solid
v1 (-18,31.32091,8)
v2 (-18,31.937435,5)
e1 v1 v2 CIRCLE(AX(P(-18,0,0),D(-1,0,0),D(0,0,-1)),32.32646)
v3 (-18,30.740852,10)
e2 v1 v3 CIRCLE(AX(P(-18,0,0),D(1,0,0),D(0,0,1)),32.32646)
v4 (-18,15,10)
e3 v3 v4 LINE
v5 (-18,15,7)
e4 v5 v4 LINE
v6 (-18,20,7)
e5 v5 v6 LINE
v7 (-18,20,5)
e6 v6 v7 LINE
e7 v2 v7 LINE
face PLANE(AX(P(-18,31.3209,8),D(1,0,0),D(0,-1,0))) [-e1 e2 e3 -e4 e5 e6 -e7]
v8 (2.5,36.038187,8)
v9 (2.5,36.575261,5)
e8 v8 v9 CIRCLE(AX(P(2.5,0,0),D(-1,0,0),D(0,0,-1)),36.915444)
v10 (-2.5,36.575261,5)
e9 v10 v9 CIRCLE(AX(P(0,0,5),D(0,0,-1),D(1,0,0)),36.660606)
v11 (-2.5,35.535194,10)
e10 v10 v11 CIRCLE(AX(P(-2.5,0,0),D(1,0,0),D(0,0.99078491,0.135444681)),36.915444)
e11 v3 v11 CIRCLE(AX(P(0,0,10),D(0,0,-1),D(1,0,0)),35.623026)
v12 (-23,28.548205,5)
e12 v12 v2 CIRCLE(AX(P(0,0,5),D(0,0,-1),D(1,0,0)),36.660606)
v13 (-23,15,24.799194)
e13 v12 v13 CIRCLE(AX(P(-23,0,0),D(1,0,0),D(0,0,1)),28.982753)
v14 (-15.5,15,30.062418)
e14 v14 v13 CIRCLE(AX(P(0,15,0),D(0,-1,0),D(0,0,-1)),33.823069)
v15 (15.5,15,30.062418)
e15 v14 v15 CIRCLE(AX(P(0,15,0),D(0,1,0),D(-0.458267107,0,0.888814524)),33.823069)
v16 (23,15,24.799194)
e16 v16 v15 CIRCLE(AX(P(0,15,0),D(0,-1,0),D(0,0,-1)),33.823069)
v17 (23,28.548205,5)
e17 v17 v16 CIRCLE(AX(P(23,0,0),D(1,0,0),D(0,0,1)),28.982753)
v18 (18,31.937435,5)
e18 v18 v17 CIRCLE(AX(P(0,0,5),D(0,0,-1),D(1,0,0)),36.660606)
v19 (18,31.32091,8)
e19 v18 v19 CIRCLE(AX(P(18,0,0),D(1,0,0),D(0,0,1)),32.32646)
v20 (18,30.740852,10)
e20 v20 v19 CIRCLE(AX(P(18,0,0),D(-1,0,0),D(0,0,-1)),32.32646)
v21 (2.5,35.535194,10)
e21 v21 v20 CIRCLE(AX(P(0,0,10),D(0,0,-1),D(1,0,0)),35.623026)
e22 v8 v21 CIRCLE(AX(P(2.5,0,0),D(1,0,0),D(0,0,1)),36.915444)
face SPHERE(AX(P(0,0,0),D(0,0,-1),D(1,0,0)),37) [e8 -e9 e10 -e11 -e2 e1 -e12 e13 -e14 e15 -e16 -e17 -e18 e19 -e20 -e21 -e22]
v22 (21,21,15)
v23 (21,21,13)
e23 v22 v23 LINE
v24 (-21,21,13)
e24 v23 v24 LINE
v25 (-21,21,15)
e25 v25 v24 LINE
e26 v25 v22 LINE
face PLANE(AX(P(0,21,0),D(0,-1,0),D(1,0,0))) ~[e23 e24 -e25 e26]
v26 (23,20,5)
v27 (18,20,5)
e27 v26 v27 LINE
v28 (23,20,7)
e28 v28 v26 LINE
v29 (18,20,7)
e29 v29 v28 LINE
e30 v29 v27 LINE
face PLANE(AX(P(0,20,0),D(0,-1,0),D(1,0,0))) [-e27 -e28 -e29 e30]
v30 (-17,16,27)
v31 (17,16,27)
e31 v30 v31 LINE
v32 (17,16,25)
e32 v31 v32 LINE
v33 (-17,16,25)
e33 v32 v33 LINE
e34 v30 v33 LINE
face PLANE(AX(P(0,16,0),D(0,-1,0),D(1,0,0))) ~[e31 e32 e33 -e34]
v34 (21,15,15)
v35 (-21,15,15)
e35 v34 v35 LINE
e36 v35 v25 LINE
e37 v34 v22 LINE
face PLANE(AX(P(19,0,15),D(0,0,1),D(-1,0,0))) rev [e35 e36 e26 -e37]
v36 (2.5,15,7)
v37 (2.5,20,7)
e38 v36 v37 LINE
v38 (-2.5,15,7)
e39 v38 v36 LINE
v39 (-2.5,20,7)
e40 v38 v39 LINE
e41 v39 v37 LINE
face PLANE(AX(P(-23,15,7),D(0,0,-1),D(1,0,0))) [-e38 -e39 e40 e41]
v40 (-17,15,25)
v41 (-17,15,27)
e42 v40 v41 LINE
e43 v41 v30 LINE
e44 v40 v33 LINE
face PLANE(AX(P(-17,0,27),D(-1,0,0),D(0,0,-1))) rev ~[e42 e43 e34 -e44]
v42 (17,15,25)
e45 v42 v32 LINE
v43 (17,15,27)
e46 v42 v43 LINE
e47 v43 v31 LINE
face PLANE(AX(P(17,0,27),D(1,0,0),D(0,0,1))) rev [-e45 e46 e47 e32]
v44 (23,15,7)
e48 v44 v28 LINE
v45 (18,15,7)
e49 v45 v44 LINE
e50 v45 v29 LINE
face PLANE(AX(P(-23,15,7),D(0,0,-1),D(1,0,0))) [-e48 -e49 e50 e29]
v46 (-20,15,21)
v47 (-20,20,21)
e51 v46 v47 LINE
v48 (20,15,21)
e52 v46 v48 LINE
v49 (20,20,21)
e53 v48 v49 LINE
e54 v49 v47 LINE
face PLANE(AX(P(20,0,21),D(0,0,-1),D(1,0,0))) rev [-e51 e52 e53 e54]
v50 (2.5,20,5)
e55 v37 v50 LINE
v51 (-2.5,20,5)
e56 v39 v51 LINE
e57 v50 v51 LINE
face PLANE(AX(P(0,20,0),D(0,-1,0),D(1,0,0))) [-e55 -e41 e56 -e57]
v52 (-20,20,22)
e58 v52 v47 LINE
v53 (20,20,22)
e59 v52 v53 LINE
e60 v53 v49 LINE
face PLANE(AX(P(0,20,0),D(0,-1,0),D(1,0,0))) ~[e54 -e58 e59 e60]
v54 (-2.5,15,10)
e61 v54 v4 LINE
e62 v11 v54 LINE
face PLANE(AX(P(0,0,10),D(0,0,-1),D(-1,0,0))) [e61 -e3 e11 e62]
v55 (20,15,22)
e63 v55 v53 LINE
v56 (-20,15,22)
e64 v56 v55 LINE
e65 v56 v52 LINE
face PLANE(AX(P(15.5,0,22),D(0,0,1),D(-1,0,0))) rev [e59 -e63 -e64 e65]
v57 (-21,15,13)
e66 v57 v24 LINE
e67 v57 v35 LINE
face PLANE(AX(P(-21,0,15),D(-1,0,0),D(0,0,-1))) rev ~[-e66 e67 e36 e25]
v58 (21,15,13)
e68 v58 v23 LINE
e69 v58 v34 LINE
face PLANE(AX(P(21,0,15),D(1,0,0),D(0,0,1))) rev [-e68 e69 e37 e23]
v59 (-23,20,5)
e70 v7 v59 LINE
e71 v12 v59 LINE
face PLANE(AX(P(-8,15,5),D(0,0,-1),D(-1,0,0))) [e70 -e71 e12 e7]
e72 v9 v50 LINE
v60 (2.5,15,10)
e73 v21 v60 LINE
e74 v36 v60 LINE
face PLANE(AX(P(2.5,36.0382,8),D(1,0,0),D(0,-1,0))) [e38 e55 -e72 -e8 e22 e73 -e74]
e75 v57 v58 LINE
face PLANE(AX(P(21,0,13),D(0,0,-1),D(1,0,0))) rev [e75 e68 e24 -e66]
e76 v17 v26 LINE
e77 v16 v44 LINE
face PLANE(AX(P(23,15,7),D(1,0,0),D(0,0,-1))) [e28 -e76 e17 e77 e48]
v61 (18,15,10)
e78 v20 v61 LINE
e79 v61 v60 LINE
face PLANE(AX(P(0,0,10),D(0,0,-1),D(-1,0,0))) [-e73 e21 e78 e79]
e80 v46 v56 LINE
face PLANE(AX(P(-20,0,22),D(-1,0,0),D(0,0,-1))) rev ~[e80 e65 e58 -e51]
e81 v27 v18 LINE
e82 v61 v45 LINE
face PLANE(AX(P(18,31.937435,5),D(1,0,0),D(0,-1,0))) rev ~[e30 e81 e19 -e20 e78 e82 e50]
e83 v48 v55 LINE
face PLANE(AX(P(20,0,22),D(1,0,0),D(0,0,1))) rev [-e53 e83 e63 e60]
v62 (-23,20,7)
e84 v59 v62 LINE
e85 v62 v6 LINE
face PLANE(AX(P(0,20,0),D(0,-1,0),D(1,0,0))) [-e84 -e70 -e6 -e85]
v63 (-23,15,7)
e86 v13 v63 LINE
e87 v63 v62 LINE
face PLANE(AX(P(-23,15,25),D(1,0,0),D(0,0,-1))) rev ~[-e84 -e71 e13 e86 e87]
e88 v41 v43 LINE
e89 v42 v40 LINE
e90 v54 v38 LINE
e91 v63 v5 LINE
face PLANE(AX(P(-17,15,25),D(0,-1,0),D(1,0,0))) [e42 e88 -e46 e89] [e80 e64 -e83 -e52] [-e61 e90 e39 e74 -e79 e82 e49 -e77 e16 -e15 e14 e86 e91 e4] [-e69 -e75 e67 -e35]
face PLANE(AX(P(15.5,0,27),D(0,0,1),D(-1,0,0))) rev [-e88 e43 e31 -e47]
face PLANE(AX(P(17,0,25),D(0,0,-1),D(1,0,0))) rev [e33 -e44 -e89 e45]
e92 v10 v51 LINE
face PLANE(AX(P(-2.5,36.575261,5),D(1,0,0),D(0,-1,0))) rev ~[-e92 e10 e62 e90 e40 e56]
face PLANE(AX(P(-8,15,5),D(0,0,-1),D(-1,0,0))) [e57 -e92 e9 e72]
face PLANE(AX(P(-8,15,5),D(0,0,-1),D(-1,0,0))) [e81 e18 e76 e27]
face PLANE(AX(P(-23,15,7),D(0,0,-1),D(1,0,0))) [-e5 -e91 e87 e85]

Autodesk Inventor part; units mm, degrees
sketch "スケッチ1" plane through (0, 0, 0) normal (0, 1, 0) x (-1, 0, 0)
  circle A0 centre (0, 0) radius 37
  line L0 (0, 0) -> (0, -37)
  line L1 (0, 0) -> (0, 37)
  dimension "d0" = 74
revolve "回転1" add sketch "スケッチ1" angle 180 about axis through (0, 0, 0) along (0, 0, 1) picked at (-2.7444, -24.3574) contours L1 L0 A0
sketch "スケッチ5" plane through (0, 0, 0) normal (0, -1, 0) x (1, 0, 0)
  line L0 (-20, -25) -> (20, -25)
  line L1 (20, -25) -> (20, -15)
  line L2 (20, -15) -> (-20, -15)
  line L3 (-20, -15) -> (-20, -25)
  line L4 (-20, -17) -> (-20, -15)
  line L5 (0, 27) -> (-17, 27)
  line L6 (-17, 27) -> (-17, 25)
  line L7 (-17, 25) -> (0, 25)
  line L8 (0, 25) -> (0, 27)
  line L9 (0, 22) -> (-20, 22)
  line L10 (-20, 22) -> (-20, 21)
  line L11 (-20, 21) -> (0, 21)
  line L12 (0, 21) -> (0, 22)
  line L13 (0, 15) -> (-21, 15)
  line L14 (-21, 15) -> (-21, 13)
  line L15 (-21, 13) -> (0, 13)
  line L16 (0, 13) -> (0, 15)
  line L17 (0, 7) -> (-23, 7)
  line L18 (-23, 7) -> (-23, 5)
  line L19 (-23, 5) -> (0, 5)
  line L20 (0, 5) -> (0, 7)
  circle A0 centre (0, 0) radius 37 projected
  circle A1 centre (0, 0) radius 37 projected
  line L21 (0, 37) -> (0, -37)
  line L22 (37, 0) -> (-37, 0)
  line L23 (-32, 4) -> (-23, 4)
  line L24 (-23, 4) -> (-23, -6)
  line L25 (-23, -6) -> (-32, -6)
  line L26 (-32, -6) -> (-32, 4)
  line L27 (-23, -8.0262) -> (-23, 4)
  line L28 (-27, 25.2982) -> (-27, -25.2982)
  line L29 (-15.5, 27) -> (-12, 27)
  line L30 (-12, 27) -> (-12, 35)
  line L31 (-12, 35) -> (-15.5, 35)
  line L32 (-15.5, 35) -> (-15.5, 27)
  line L33 (-15.5, 25) -> (0, 25)
  line L34 (0, 25) -> (0, 22)
  line L35 (0, 22) -> (-15.5, 22)
  line L36 (-15.5, 22) -> (-15.5, 25)
  line L37 (-19, 15) -> (0, 15)
  line L38 (0, 15) -> (0, 21)
  line L39 (0, 21) -> (-19, 21)
  line L40 (-19, 21) -> (-19, 15)
  line L41 (-19, 13) -> (0, 13)
  line L42 (0, 13) -> (0, 7)
  line L43 (0, 7) -> (-19, 7)
  line L44 (-19, 7) -> (-19, 13)
  line L45 (-23, -1) -> (-39.6865, -1)
  line L46 (-23, -1) -> (-7.8337, -1)
  line L47 (-8, 5) -> (-23, 5)
  line L48 (-23, 5) -> (-23, -7)
  line L49 (-23, -7) -> (-8, -7)
  line L50 (-8, -7) -> (-8, 5)
  line L51 (-8, 5) -> (-23, -7) construction
  line L52 (-23, 5) -> (-8, -7) construction
  line L53 (-23, 6) -> (-33, 6)
  line L54 (-33, 6) -> (-33, -8)
  line L55 (-33, -8) -> (-23, -8)
  line L56 (-23, -8) -> (-23, 6)
  line L57 (-23, 6) -> (-33, -8) construction
  line L58 (-33, 6) -> (-23, -8) construction
  line L59 (-8, 5) -> (-1, 5)
  line L60 (-1, 5) -> (-1, -7)
  line L61 (-1, -7) -> (-8, -7)
  line L62 (-8, -7) -> (-8, 5)
  line L63 (-8, 5) -> (-1, -7) construction
  line L64 (-1, 5) -> (-8, -7) construction
  line L65 (-23, 4) -> (-27, 4)
  line L66 (-23, -6) -> (-27, -6)
  line L67 (-23, 6) -> (-27, 6)
  line L68 (-23, -8) -> (-27, -8)
  line L69 (26.3249, -26) -> (-26.3249, -26)
  line L70 (-8, 5) -> (-6.8, 5)
  line L71 (-6.8, 5) -> (-6.8, -7)
  line L72 (-6.8, -7) -> (-8, -7)
  line L73 (-8, -7) -> (-8, 5)
  line L74 (-3, 7) -> (0, 7)
  line L75 (0, 22) -> (-4, 22)
  line L76 (-4, 21) -> (0, 21)
  line L77 (0, 21) -> (0, 22)
  line L78 (-6, 7) -> (-1, 7)
  line L79 (-1, 5) -> (-6, 5)
  point P0 (0, -25)
  point P1 (0, -15)
  point P2 (0, 26)
  point P3 (0, 21.5)
  point P4 (0, 14)
  point P5 (0, 6)
  point P6 (-20, -20)
  point P7 (-27, -0.5262)
  point P8 (-15.5, 23.5)
  point P9 (-15.5, 33.5969)
  point P10 (0, 27)
  point P11 (0, 37)
  point P12 (0, 25)
  point P13 (0, 13)
  point P14 (0, 15)
  point P15 (-27, 0)
  point P16 (-32, 0)
  point P17 (-23, 0)
  point P18 (-15.5, -1)
  point P19 (-28, -1)
  point P20 (-4.5, -1)
  point P21 (-8, 5)
  point P22 (-27, 0.5)
  point P23 (-28, 0.4738)
  point P24 (-28, -11.5262)
  point P25 (-27, -11.5)
  point P26 (-23, -6)
  point P27 (-23, 4)
  point P28 (-23, 4)
  point P29 (-23, -6)
  point P30 (-23, -7)
  point P31 (-8, 0)
  point P32 (-1, 0)
  point P33 (-26.3249, -26)
  point P34 (0, 22)
  point P35 (-27, 6)
  point P36 (-19, 10)
  dimension "d12" = 40
  dimension "d13" = 10
  dimension "d23" = 17
  dimension "d24" = 2
  dimension "d27" = 20
  dimension "d28" = 1
  dimension "d30" = 21
  dimension "d31" = 2
  dimension "d33" = 2
  dimension "d88" = 0
  dimension "d89" = 0
  dimension "d90" = 12
  dimension "d92" = 20
  dimension "d93" = 10
  dimension "d97" = 9
  dimension "d98" = 10
  dimension "d113" = 27
  dimension "d122" = 15.5
  dimension "d123" = 35
  dimension "d124" = 3
  dimension "d125" = 15.5
  dimension "d126" = 6
  dimension "d127" = 6
  dimension "d147" = 12
  dimension "d149" = 8
  dimension "d151" = 15
  dimension "d161" = 14
  dimension "d162" = 10
  dimension "d164" = 12
  dimension "d165" = 7
  dimension "d170" = 26
  dimension "d175" = 1.2
  dimension "d207" = 0
  dimension "d283" = 2
  dimension "d284" = 2
extrude "GNSボード" cut sketch "スケッチ5" against normal blind 16 contours L8 L7 L6 L5
extrude "GNSボード止めるよう" cut sketch "スケッチ5" against normal blind 15 contours L21 L5 L30 A0 | L30 L5 L32 A0 | L21 L9 L36 L7
extrude "アルミ板１" cut sketch "スケッチ5" against normal blind 20 contours L11 L10 L9 L12
extrude "メイン基板" cut sketch "スケッチ5" against normal blind 21 contours L15 L14 L13 L16
extrude "メイン止めるよう" cut sketch "スケッチ5" against normal blind 14.5 contours L17 L44 L15 L21 | L13 L40 L11 L21
extrude "アルミ板２" cut sketch "スケッチ5" against normal blind 20 contours L19 L18 L17 L20
extrude "電池ボックス入れ" cut sketch "スケッチ5" against normal blind 13 contours L3 L2 L21 L0 | L21 L2 L1 L0
extrude "side ut" cut sketch "スケッチ5" against normal blind 100 contours A0 L45 L54 L55 L28 | A0 L22 L54 L45 | L55 L54 L45 L26 L25 L28 | A0 L28 L53 L54 L22 | L54 L22 L26 L45 | L25 L26 L45 L28 | L54 L53 L28 L23 L26 L22 | L26 L22 L28 L45 | L22 L26 L23 L28
extrude "motor case" add sketch "スケッチ5" against normal blind 7 contours L55 L54 L45 L26 L25 L28 | L28 L25 L27 L55 | L50 L46 L24 L22 | L22 L24 L48 L19 L50 | L54 L22 L26 L45 | L28 L45 L24 L25 | L25 L26 L45 L28 | L24 L45 L28 L22 | L22 L28 L23 L24 | L50 L49 L27 L24 L46 | L54 L53 L28 L23 L26 L22 | L26 L22 L28 L45 | L22 L26 L23 L28 | L23 L28 L53 L18 L48
extrude "bottom cut" cut sketch "スケッチ5" against normal blind 90 contours L69 A0 L21 | L21 A0 L69
extrude "motor" cut sketch "スケッチ5" against normal blind 6 contours L60 L61 L71 L22 | L22 L71 L19 L60 | L71 L61 L50 L22 | L22 L50 L19 L71 | L50 L46 L24 L22 | L22 L24 L48 L19 L50 | L28 L45 L24 L25 | L25 L26 L45 L28 | L24 L45 L28 L22 | L22 L28 L23 L24 | L50 L49 L27 L24 L46 | L26 L22 L28 L45 | L22 L26 L23 L28
extrude "motor block" add sketch "スケッチ5" against normal blind 10 contours L71 L61 L50 L22 | L22 L50 L19 L71
sketch "スケッチ27" plane through (-33, 0, -8) normal (-1, 0, 0) x (0, 0, 1)
  line L0 (14, 0) -> (0, 0) projected
  circle A0 centre (7, 0) radius 3
  point P0 (8, 0)
  dimension "d198" = 6
extrude "押し出し36" cut sketch "スケッチ27" against normal blind 27
mirror "ミラー13" about plane through (0, 0, 0) normal (1, 0, 0) of "メイン止めるよう", "メイン基板", "アルミ板１", "GNSボード止めるよう", "GNSボード", "アルミ板２", "motor", "motor case", "押し出し36", "電池ボックス入れ", "side ut", "motor block"
ref_plane "作業平面5" through (-17, 17.5, 25) normal (0, -1, 0) x (1, 0, 0)
ref_plane "作業平面6" through (20, 13, -15) normal (0, 0, -1) x (1, 0, 0)
sketch "スケッチ38" plane through (20, 13, -15) normal (0, 0, -1) x (1, 0, 0)
  line L0 (-40, 13) -> (0, 13) projected
  line L1 (-40, 13) -> (-40, 0) projected
  line L2 (-40, 0) -> (0, 0) projected
  line L3 (0, 13) -> (0, 0) projected
  line L4 (-38, 6) -> (-28, 6)
  line L5 (-28, 6) -> (-28, -3)
  line L6 (-28, -3) -> (-38, -3)
  line L7 (-38, -3) -> (-38, 6)
  point P0 (-20, 13)
  dimension "d235" = 3
  dimension "d236" = 9
  dimension "d237" = 10
  dimension "d238" = 2
extrude "押し出し44" cut sketch "スケッチ38" against normal blind 18 contours L7 L4 L5 L2 | L2 L5 L6 L7
ref_plane "作業平面7" through (27, 35, 6) normal (0, -1, 0) x (1, 0, 0)
sketch "スケッチ41" plane through (-17, 0, 25) normal (0, -1, 0) x (1, 0, 0)
  line L0 (-16, -23) -> (-15, -23) projected
  line L1 (-15, -23) -> (-15, -21) projected
  line L2 (-15, -21) -> (-6, -21) projected
  line L3 (-6, -21) -> (-6, -18) projected
  line L4 (-6, -18) -> (-2, -18) projected
  line L5 (-2, -18) -> (-2, -12) projected
  line L6 (-2, -12) -> (-4, -12) projected
  line L7 (-4, -12) -> (-4, -10) projected
  line L8 (-4, -10) -> (-2, -10) projected
  line L9 (-2, -10) -> (-2, -4) projected
  line L10 (-2, -4) -> (-3, -4) projected
  line L11 (-3, -4) -> (-3, -3) projected
  line L12 (-3, -3) -> (1.5, -3) projected
  line L13 (1.5, -3) -> (1.5, 0) projected
  line L14 (1.5, 0) -> (0, 0) projected
  line L15 (0, 0) -> (0, 2) projected
  line L16 (0, 2) -> (1.5, 2) projected
  line L17 (1.5, 2) -> (1.5, 8.5969) projected
  arc A0 (1.5, 8.5969) -> (-10, 0.2982) centre (17, -25) ccw projected
  line L18 (-10, 0.2982) -> (-10, -19) projected
  line L19 (-10, -19) -> (-16, -19) projected
  line L20 (-16, -19) -> (-16, -23) projected
  line L21 (-2, -18) -> (-2, -12) projected
  line L22 (-4, -10) -> (-4, -12) projected
  line L23 (0, 2) -> (0, 0) projected
  circle A1 centre (-4, 0) radius 2
  dimension "d252" = 4
  dimension "d253" = 4
  dimension "d254" = 3
extrude "押し出し46" cut sketch "スケッチ41" against normal blind 10 contours A1
mirror "ミラー15" about plane through (0, 0, 0) normal (1, 0, 0) of "押し出し46"
sketch "スケッチ42" plane through (-33, 0, -8) normal (0, -1, 0) x (1, 0, 0)
  circle A0 centre (9.5, -8) radius 2
  line L0 (13, -17) -> (13, -7) projected
  line L1 (10, 2) -> (1, 2) projected
  point P0 (33, 8)
  dimension "d257" = 3.5
  dimension "d258" = 4
  dimension "d259" = 10
extrude "押し出し47" cut sketch "スケッチ42" against normal blind 10
mirror "ミラー16" about plane through (0, 0, 0) normal (1, 0, 0) of "押し出し47"
ref_plane "作業平面8" through (-17, 15, 25) normal (0, -1, 0) x (1, 0, 0)
sketch "スケッチ45" plane through (-17, 15, 25) normal (0, -1, 0) x (1, 0, 0)
  circle A0 centre (-4, 0) radius 2 projected
  line L0 (-16, -23) -> (-15, -23) projected
  line L1 (-15, -23) -> (-15, -21) projected
  line L2 (-15, -21) -> (-6, -21) projected
  line L3 (-6, -21) -> (-6, -18) projected
  line L4 (-6, -18) -> (-2, -18) projected
  line L5 (-2, -18) -> (-2, -12) projected
  line L6 (-2, -12) -> (-4, -12) projected
  line L7 (-4, -12) -> (-4, -10) projected
  line L8 (-4, -10) -> (-2, -10) projected
  line L9 (-2, -10) -> (-2, -4) projected
  line L10 (-2, -4) -> (-3, -4) projected
  line L11 (-3, -4) -> (-3, -3) projected
  line L12 (-3, -3) -> (1.5, -3) projected
  line L13 (1.5, -3) -> (1.5, 0) projected
  line L14 (1.5, 0) -> (0, 0) projected
  line L15 (0, 0) -> (0, 2) projected
  line L16 (0, 2) -> (1.5, 2) projected
  line L17 (1.5, 2) -> (1.5, 8.5969) projected
  arc A1 (1.5, 8.5969) -> (-10, 0.2982) centre (17, -25) ccw projected
  line L18 (-10, 0.2982) -> (-10, -19) projected
  line L19 (-10, -19) -> (-16, -19) projected
  line L20 (-16, -19) -> (-16, -23) projected
  arc A2 (32.5, 5.0624) -> (1.5, 5.0624) centre (17, -25) ccw projected
  line L21 (1.5, 2) -> (1.5, 5.0624) projected
  line L22 (32.5, 2) -> (1.5, 2) projected
  line L23 (32.5, 2) -> (32.5, 5.0624) projected
  circle A3 centre (38, 0) radius 2 projected
  circle A4 centre (38, 0) radius 2 projected
  line L24 (49, -23) -> (50, -23) projected
  line L25 (50, -19) -> (50, -23) projected
  line L26 (44, -19) -> (50, -19) projected
  line L27 (44, -19) -> (44, 0.2982) projected
  arc A5 (44, 0.2982) -> (32.5, 8.5969) centre (17, -25) ccw projected
  line L28 (32.5, 8.5969) -> (32.5, 2) projected
  line L29 (32.5, 2) -> (34, 2) projected
  line L30 (34, 2) -> (34, 0) projected
  line L31 (34, 0) -> (32.5, 0) projected
  line L32 (32.5, 0) -> (32.5, -3) projected
  line L33 (32.5, -3) -> (37, -3) projected
  line L34 (37, -3) -> (37, -4) projected
  line L35 (37, -4) -> (36, -4) projected
  line L36 (36, -4) -> (36, -10) projected
  line L37 (36, -10) -> (38, -10) projected
  line L38 (38, -10) -> (38, -12) projected
  line L39 (38, -12) -> (36, -12) projected
  line L40 (36, -12) -> (36, -18) projected
  line L41 (36, -18) -> (40, -18) projected
  line L42 (40, -18) -> (40, -21) projected
  line L43 (40, -21) -> (49, -21) projected
  line L44 (49, -21) -> (49, -23) projected
  circle A6 centre (-4, 0) radius 2 projected
  line L45 (1.5, 0) -> (32.5, 0) projected
  line L46 (32.5, -3) -> (1.5, -3) projected
  line L47 (32.5, -3) -> (32.5, 0) projected
  line L48 (1.5, 0) -> (32.5, 0) projected
  line L49 (1.5, -3) -> (1.5, 0) projected
  line L50 (34, 0) -> (0, 0) projected
  line L51 (34, 0) -> (34, 2) projected
  line L52 (34, 2) -> (0, 2) projected
  line L53 (0, 0) -> (0, 2) projected
  line L54 (36, -10) -> (-2, -10) projected
  line L55 (36, -10) -> (36, -4) projected
  line L56 (-2, -4) -> (36, -4) projected
  line L57 (-2, -10) -> (-2, -4) projected
  line L58 (38, -12) -> (-4, -12) projected
  line L59 (38, -12) -> (38, -10) projected
  line L60 (38, -10) -> (-4, -10) projected
  line L61 (-4, -12) -> (-4, -10) projected
  line L62 (36, -18) -> (-2, -18) projected
  line L63 (36, -18) -> (36, -12) projected
  line L64 (-2, -12) -> (36, -12) projected
  line L65 (-2, -18) -> (-2, -12) projected
  line L66 (40, -20) -> (-6, -20) projected
  line L67 (40, -20) -> (40, -18) projected
  line L68 (40, -18) -> (-6, -18) projected
  line L69 (-6, -20) -> (-6, -18) projected
  circle A7 centre (40.5, -41) radius 2 projected
  circle A8 centre (-6.5, -41) radius 2 projected
  line L70 (25, -29) -> (23.8, -29) projected
  line L71 (23.8, -32) -> (23.8, -29) projected
  line L72 (23.8, -32) -> (18, -32) projected
  line L73 (18, -32) -> (18, -20) projected
  line L74 (18, -20) -> (16, -20) projected
  line L75 (16, -20) -> (16, -32) projected
  line L76 (16, -32) -> (10.2, -32) projected
  line L77 (10.2, -32) -> (10.2, -29) projected
  line L78 (10.2, -29) -> (9, -29) projected
  line L79 (9, -29) -> (9, -32) projected
  line L80 (9, -32) -> (-6, -32) projected
  line L81 (-6, -32) -> (-6, -31) projected
  line L82 (-6, -31) -> (-15, -31) projected
  line L83 (-15, -31) -> (-15, -29) projected
  line L84 (-15, -29) -> (-16, -29) projected
  line L85 (-16, -29) -> (-16, -33) projected
  line L86 (-16, -33) -> (-10, -33) projected
  line L87 (-10, -33) -> (-10, -50.2982) projected
  arc A9 (-10, -50.2982) -> (-9.3249, -51) centre (17, -25) ccw projected
  line L88 (-9.3249, -51) -> (43.3249, -51) projected
  arc A10 (43.3249, -51) -> (44, -50.2982) centre (17, -25) ccw projected
  line L89 (44, -50.2982) -> (44, -33) projected
  line L90 (50, -33) -> (44, -33) projected
  line L91 (50, -29) -> (50, -33) projected
  line L92 (50, -29) -> (49, -29) projected
  line L93 (49, -29) -> (49, -31) projected
  line L94 (49, -31) -> (40, -31) projected
  line L95 (40, -31) -> (40, -32) projected
  line L96 (40, -32) -> (25, -32) projected
  line L97 (25, -29) -> (25, -32) projected
  line L98 (-3, -40) -> (37, -40) projected
  line L99 (37, -40) -> (37, -50) projected
  line L100 (37, -50) -> (-3, -50) projected
  line L101 (-3, -50) -> (-3, -40) projected
  line L102 (-6, -18) -> (40, -18)
  line L103 (40, -18) -> (40, 8.8231)
  line L104 (40, 8.8231) -> (-6, 8.8231)
  line L105 (-6, 8.8231) -> (-6, -18)
  arc A11 (32.5, 5.0624) -> (1.5, 5.0624) centre (17, -25) ccw projected
  line L106 (32.5, 5.0624) -> (32.5, 8.5969) projected
  arc A12 (44, 0.2982) -> (32.5, 8.5969) centre (17, -25) ccw projected
  line L107 (44, 0.2982) -> (44, -50.2982) projected
  arc A13 (43.3249, -51) -> (44, -50.2982) centre (17, -25) ccw projected
  line L108 (43.3249, -51) -> (-9.3249, -51) projected
  arc A14 (-10, -50.2982) -> (-9.3249, -51) centre (17, -25) ccw projected
  line L109 (-10, -50.2982) -> (-10, 0.2982) projected
  arc A15 (1.5, 8.5969) -> (-10, 0.2982) centre (17, -25) ccw projected
  line L110 (1.5, 8.5969) -> (1.5, 5.0624) projected
  line L111 (9, -32) -> (9, -20) projected
  line L112 (-6, -20) -> (9, -20) projected
  line L113 (-6, -21) -> (-6, -20) projected
  line L114 (-15, -21) -> (-6, -21) projected
  line L115 (-15, -31) -> (-15, -21) projected
  line L116 (-6, -31) -> (-15, -31) projected
  line L117 (-6, -32) -> (-6, -31) projected
  line L118 (9, -32) -> (-6, -32) projected
  line L119 (50, -29) -> (49, -29) projected
  line L120 (50, -23) -> (50, -29) projected
  line L121 (49, -23) -> (50, -23) projected
  line L122 (49, -29) -> (49, -23) projected
  line L123 (-16, -23) -> (-15, -23) projected
  line L124 (-16, -29) -> (-16, -23) projected
  line L125 (-15, -29) -> (-16, -29) projected
  line L126 (-15, -23) -> (-15, -29) projected
  point P0 (-10, -19)
  point P1 (-10, -33)
  point P2 (44, -33)
  point P3 (44, -19)
  point P4 (40, 3.9828)
  point P5 (40, -18)
  point P6 (40, -20)
  point P7 (-6, -20)
  point P8 (-6, -18)
  point P9 (-6, 3.9828)
  point P10 (-10, -33)
  point P11 (-10, -31)
  point P12 (44, -31)
  point P13 (44, -33)
  point P14 (50, -29)
  point P15 (50, -23)
  point P16 (44, -19)
  point P17 (-16, -23)
  point P18 (-16, -29)
  point P19 (-10, -19)
extrude "side and front cut" cut sketch "スケッチ45" along normal mid plane 100 contours L105 L3 L2 L109 L18 A1 | L66 L111 L79 L80 L81 L82 L109 L2 L3 | L109 L2 L1 L0 L20 L19 | L66 L75 L76 L77 L78 L111 | L109 L82 L83 L115 L1 L2 | L66 L73 L72 L71 L70 L97 L96 L95 L94 L107 L89 A10 L88 A9 L87 L109 L82 L81 L80 L79 L78 L77 L76 L75 | L103 A5 L27 L107 L43 L42 | L0 L115 L84 L124 | L109 L86 L85 L84 L83 L82 | L66 L42 L43 L107 L94 L95 L96 L97 L70 L71 L72 L73 | L26 L25 L24 L44 L43 L107 | L43 L44 L122 L93 L94 L107 | L94 L93 L92 L91 L90 L107 | L120 L92 L122 L24 | A7 | A8 | L98 L99 L100 L101
sketch "スケッチ46" plane through (-17, 15, 25) normal (0, -1, 0) x (1, 0, 0)
  line L0 (-6, 0) -> (-6, -18) projected
  line L1 (-6, -18) -> (-2, -18) projected
  line L2 (-2, -18) -> (-2, -12) projected
  line L3 (-2, -12) -> (-4, -12) projected
  line L4 (-4, -12) -> (-4, -10) projected
  line L5 (-4, -10) -> (-2, -10) projected
  line L6 (-2, -10) -> (-2, -4) projected
  line L7 (-2, -4) -> (-3, -4) projected
  line L8 (-3, -4) -> (-3, -3) projected
  line L9 (-3, -3) -> (1.5, -3) projected
  line L10 (1.5, -3) -> (1.5, 0) projected
  line L11 (1.5, 0) -> (0, 0) projected
  line L12 (0, 0) -> (0, 2) projected
  line L13 (0, 2) -> (1.5, 2) projected
  line L14 (1.5, 2) -> (1.5, 8.5969) projected
  arc A0 (1.5, 8.5969) -> (-6, 3.9828) centre (17, -25) ccw projected
  line L15 (-6, 3.9828) -> (-6, 0) projected
  circle A1 centre (-4, 0) radius 2 projected
  circle A2 centre (-4, 0) radius 2 projected
  line L16 (40, -18) -> (40, 0) projected
  circle A3 centre (38, 0) radius 2 projected
  line L17 (40, 0) -> (40, 3.9828) projected
  arc A4 (40, 3.9828) -> (32.5, 8.5969) centre (17, -25) ccw projected
  line L18 (32.5, 8.5969) -> (32.5, 2) projected
  line L19 (32.5, 2) -> (34, 2) projected
  line L20 (34, 2) -> (34, 0) projected
  line L21 (34, 0) -> (32.5, 0) projected
  line L22 (32.5, 0) -> (32.5, -3) projected
  line L23 (32.5, -3) -> (37, -3) projected
  line L24 (37, -3) -> (37, -4) projected
  line L25 (37, -4) -> (36, -4) projected
  line L26 (36, -4) -> (36, -10) projected
  line L27 (36, -10) -> (38, -10) projected
  line L28 (38, -10) -> (38, -12) projected
  line L29 (38, -12) -> (36, -12) projected
  line L30 (36, -12) -> (36, -18) projected
  line L31 (36, -18) -> (40, -18) projected
  arc A5 (32.5, 5.0624) -> (1.5, 5.0624) centre (17, -25) ccw projected
  line L32 (1.5, 2) -> (1.5, 5.0624) projected
  line L33 (32.5, 2) -> (1.5, 2) projected
  line L34 (32.5, 2) -> (32.5, 5.0624) projected
  line L35 (34, 0) -> (0, 0) projected
  line L36 (34, 0) -> (34, 2) projected
  line L37 (34, 2) -> (0, 2) projected
  line L38 (0, 0) -> (0, 2) projected
  line L39 (32.5, -3) -> (1.5, -3) projected
  line L40 (32.5, -3) -> (32.5, 0) projected
  line L41 (1.5, 0) -> (32.5, 0) projected
  line L42 (1.5, -3) -> (1.5, 0) projected
  line L43 (36, -10) -> (-2, -10) projected
  line L44 (36, -10) -> (36, -4) projected
  line L45 (-2, -4) -> (36, -4) projected
  line L46 (-2, -10) -> (-2, -4) projected
  line L47 (36, -18) -> (-2, -18) projected
  line L48 (36, -18) -> (36, -12) projected
  line L49 (-2, -12) -> (36, -12) projected
  line L50 (-2, -18) -> (-2, -12) projected
  point P0 (1.5, 5.0624)
  point P1 (-2, -18)
  point P2 (36, -18)
extrude "front cut 2" cut sketch "スケッチ46" along normal blind 100 contours L15 A0 L14 L13 L12 L11 L10 L9 L8 L7 L6 L5 L4 L3 L2 L1 L0 | A1 | L2 L49 L30 L47 | L3 L4 L5 L43 L27 L28 L29 L49 | A3 | L30 L29 L28 L27 L26 L25 L24 L23 L22 L21 L20 L19 L18 A4 L17 L16 L31 | A5 L18 L33 L14 | L33 L19 L20 L21 L35 L11 L12 L13 | L6 L45 L26 L43 | L7 L8 L9 L39 L23 L24 L25 L45 | L35 L22 L39 L10
sketch "スケッチ48" plane through (0, 0, 5) normal (0, 0, -1) x (-1, 0, 0)
  line L0 (-23, 20) -> (23, 20) projected
  line L1 (23, 28.5482) -> (23, 20) projected
  arc A0 (23, 28.5482) -> (-23, 28.5482) centre (0, 0) ccw projected
  line L2 (-23, 28.5482) -> (-23, 20) projected
  line L3 (-23, 15) -> (23, 15) projected
  line L4 (-23, 15) -> (-23, 20) projected
  line L5 (23, 15) -> (23, 20) projected
  line L6 (-23, 40) -> (-18, 40)
  line L7 (-18, 40) -> (-18, 15)
  line L8 (-18, 15) -> (-23, 15)
  line L9 (-23, 15) -> (-23, 40)
  line L10 (18, 40) -> (23, 40)
  line L11 (23, 40) -> (23, 15)
  line L12 (23, 15) -> (18, 15)
  line L13 (18, 15) -> (18, 40)
  line L14 (-2.5, 36.6606) -> (2.5, 36.6606)
  line L15 (2.5, 36.6606) -> (2.5, 20)
  line L16 (2.5, 20) -> (-2.5, 20)
  line L17 (-2.5, 20) -> (-2.5, 36.6606)
  line L18 (0, 0) -> (0, 36.6606)
  point P0 (0, 0)
  point P1 (18, 20)
  point P2 (18, 31.9374)
  point P3 (-18, 31.9374)
  point P4 (-18, 20)
  point P5 (2.5, 36.5753)
  point P6 (2.5, 20)
  point P7 (-2.5, 36.5753)
  dimension "d274" = 25
  dimension "d275" = 5
  dimension "d276" = 25
  dimension "d277" = 5
  dimension "d280" = 5
  dimension "d282" = 2.5
extrude "lock cut" cut sketch "スケッチ48" against normal blind 3 contours L7 A0 L17 L0 | L15 A0 L13 L0
sketch "スケッチ49" plane through (23, 15, 7) normal (0, 0, -1) x (-1, 0, 0)
  line L0 (46, 0) -> (0, 0) projected
  line L1 (46, -15) -> (46, 5) projected
  line L2 (0, 0) -> (46, 0)
  line L3 (46, 0) -> (46, 5)
  line L4 (46, 5) -> (0, 5)
  line L5 (0, 5) -> (0, 0)
  point P0 (23, -15)
  point P1 (38.5, 0)
  point P2 (7.5, 0)
extrude "押し出し52" cut sketch "スケッチ49" against normal up to surface (1 mm away)
sketch "スケッチ50" plane through (0, 0, 5) normal (0, 0, -1) x (-1, 0, 0)
  point P0 (0, 0)
sketch "スケッチ51" plane through (0, 0, 8) normal (0, 0, -1) x (-1, 0, 0)
  line L0 (-23, 15) -> (-23, 28.5482) projected
  line L1 (18, 20) -> (23, 20) projected
  line L2 (-23, 15) -> (23, 15)
  line L3 (23, 15) -> (23, 20)
  line L4 (23, 20) -> (-23, 20)
  line L5 (-23, 20) -> (-23, 15)
  arc A0 (18, 31.3209) -> (2.5, 36.0382) centre (0, 0) ccw projected
  line L6 (2.5, 20) -> (2.5, 36.0382) projected
  line L7 (-2.5, 36.0382) -> (-2.5, 20) projected
  arc A1 (-2.5, 36.0382) -> (-18, 31.3209) centre (0, 0) ccw projected
  line L8 (-18, 20) -> (-18, 31.3209) projected
  line L9 (18, 31.3209) -> (18, 20) projected
  line L10 (-2.5, 20) -> (-18, 20) projected
  line L11 (18, 20) -> (2.5, 20) projected
  point P0 (2.5, 20)
  point P1 (-2.5, 20)
extrude "押し出し53" cut sketch "スケッチ51" against normal blind 2
sketch "スケッチ52" plane through (0, 0, 10) normal (0, 0, -1) x (-1, 0, 0)
  line L0 (-23, 20) -> (-18, 20) projected
  line L1 (-23, 20) -> (-18, 20) projected
  line L2 (-2.5, 20) -> (2.5, 20) projected
  line L3 (-2.5, 20) -> (2.5, 20) projected
  point P0 (0, 0)
sketch "スケッチ53" plane through (0, 15, 0) normal (0, -1, 0) x (1, 0, 0)
  line L0 (18, 10) -> (18, 5) projected
  line L1 (23, 5) -> (18, 5) projected
  line L2 (23, 10) -> (23, 5) projected
  line L3 (23, 10) -> (18, 10) projected
  line L4 (-2.5, 10) -> (-2.5, 5) projected
  line L5 (2.5, 5) -> (-2.5, 5) projected
  line L6 (2.5, 5) -> (2.5, 10) projected
  line L7 (2.5, 10) -> (-2.5, 10) projected
  line L8 (-18, 5) -> (-18, 10) projected
  line L9 (-18, 10) -> (-23, 10) projected
  line L10 (-23, 5) -> (-23, 10) projected
  line L11 (-18, 5) -> (-23, 5) projected
  point P0 (0, 0)
extrude "押し出し54" add sketch "スケッチ53" against normal up to surface (5 mm away)
sketch "スケッチ54" plane through (0, 15, 0) normal (0, -1, 0) x (1, 0, 0)
  line L0 (-18, 10) -> (-2.5, 10) projected
  line L1 (23, 24.7992) -> (23, 5) projected
  line L2 (23, 5) -> (-23, 5)
  line L3 (-23, 5) -> (-23, 7)
  line L4 (-23, 7) -> (23, 7)
  line L5 (23, 7) -> (23, 5)
  line L6 (18, 5) -> (23, 5) projected
  point P0 (0, 0)
  point P1 (23, 5)
  point P2 (23, 7)
  dimension "d295" = 2
  dimension "d296" = 46
extrude "押し出し55" cut sketch "スケッチ54" against normal blind 5
properties part number "body back for main 3" material "ABS プラスチック"
